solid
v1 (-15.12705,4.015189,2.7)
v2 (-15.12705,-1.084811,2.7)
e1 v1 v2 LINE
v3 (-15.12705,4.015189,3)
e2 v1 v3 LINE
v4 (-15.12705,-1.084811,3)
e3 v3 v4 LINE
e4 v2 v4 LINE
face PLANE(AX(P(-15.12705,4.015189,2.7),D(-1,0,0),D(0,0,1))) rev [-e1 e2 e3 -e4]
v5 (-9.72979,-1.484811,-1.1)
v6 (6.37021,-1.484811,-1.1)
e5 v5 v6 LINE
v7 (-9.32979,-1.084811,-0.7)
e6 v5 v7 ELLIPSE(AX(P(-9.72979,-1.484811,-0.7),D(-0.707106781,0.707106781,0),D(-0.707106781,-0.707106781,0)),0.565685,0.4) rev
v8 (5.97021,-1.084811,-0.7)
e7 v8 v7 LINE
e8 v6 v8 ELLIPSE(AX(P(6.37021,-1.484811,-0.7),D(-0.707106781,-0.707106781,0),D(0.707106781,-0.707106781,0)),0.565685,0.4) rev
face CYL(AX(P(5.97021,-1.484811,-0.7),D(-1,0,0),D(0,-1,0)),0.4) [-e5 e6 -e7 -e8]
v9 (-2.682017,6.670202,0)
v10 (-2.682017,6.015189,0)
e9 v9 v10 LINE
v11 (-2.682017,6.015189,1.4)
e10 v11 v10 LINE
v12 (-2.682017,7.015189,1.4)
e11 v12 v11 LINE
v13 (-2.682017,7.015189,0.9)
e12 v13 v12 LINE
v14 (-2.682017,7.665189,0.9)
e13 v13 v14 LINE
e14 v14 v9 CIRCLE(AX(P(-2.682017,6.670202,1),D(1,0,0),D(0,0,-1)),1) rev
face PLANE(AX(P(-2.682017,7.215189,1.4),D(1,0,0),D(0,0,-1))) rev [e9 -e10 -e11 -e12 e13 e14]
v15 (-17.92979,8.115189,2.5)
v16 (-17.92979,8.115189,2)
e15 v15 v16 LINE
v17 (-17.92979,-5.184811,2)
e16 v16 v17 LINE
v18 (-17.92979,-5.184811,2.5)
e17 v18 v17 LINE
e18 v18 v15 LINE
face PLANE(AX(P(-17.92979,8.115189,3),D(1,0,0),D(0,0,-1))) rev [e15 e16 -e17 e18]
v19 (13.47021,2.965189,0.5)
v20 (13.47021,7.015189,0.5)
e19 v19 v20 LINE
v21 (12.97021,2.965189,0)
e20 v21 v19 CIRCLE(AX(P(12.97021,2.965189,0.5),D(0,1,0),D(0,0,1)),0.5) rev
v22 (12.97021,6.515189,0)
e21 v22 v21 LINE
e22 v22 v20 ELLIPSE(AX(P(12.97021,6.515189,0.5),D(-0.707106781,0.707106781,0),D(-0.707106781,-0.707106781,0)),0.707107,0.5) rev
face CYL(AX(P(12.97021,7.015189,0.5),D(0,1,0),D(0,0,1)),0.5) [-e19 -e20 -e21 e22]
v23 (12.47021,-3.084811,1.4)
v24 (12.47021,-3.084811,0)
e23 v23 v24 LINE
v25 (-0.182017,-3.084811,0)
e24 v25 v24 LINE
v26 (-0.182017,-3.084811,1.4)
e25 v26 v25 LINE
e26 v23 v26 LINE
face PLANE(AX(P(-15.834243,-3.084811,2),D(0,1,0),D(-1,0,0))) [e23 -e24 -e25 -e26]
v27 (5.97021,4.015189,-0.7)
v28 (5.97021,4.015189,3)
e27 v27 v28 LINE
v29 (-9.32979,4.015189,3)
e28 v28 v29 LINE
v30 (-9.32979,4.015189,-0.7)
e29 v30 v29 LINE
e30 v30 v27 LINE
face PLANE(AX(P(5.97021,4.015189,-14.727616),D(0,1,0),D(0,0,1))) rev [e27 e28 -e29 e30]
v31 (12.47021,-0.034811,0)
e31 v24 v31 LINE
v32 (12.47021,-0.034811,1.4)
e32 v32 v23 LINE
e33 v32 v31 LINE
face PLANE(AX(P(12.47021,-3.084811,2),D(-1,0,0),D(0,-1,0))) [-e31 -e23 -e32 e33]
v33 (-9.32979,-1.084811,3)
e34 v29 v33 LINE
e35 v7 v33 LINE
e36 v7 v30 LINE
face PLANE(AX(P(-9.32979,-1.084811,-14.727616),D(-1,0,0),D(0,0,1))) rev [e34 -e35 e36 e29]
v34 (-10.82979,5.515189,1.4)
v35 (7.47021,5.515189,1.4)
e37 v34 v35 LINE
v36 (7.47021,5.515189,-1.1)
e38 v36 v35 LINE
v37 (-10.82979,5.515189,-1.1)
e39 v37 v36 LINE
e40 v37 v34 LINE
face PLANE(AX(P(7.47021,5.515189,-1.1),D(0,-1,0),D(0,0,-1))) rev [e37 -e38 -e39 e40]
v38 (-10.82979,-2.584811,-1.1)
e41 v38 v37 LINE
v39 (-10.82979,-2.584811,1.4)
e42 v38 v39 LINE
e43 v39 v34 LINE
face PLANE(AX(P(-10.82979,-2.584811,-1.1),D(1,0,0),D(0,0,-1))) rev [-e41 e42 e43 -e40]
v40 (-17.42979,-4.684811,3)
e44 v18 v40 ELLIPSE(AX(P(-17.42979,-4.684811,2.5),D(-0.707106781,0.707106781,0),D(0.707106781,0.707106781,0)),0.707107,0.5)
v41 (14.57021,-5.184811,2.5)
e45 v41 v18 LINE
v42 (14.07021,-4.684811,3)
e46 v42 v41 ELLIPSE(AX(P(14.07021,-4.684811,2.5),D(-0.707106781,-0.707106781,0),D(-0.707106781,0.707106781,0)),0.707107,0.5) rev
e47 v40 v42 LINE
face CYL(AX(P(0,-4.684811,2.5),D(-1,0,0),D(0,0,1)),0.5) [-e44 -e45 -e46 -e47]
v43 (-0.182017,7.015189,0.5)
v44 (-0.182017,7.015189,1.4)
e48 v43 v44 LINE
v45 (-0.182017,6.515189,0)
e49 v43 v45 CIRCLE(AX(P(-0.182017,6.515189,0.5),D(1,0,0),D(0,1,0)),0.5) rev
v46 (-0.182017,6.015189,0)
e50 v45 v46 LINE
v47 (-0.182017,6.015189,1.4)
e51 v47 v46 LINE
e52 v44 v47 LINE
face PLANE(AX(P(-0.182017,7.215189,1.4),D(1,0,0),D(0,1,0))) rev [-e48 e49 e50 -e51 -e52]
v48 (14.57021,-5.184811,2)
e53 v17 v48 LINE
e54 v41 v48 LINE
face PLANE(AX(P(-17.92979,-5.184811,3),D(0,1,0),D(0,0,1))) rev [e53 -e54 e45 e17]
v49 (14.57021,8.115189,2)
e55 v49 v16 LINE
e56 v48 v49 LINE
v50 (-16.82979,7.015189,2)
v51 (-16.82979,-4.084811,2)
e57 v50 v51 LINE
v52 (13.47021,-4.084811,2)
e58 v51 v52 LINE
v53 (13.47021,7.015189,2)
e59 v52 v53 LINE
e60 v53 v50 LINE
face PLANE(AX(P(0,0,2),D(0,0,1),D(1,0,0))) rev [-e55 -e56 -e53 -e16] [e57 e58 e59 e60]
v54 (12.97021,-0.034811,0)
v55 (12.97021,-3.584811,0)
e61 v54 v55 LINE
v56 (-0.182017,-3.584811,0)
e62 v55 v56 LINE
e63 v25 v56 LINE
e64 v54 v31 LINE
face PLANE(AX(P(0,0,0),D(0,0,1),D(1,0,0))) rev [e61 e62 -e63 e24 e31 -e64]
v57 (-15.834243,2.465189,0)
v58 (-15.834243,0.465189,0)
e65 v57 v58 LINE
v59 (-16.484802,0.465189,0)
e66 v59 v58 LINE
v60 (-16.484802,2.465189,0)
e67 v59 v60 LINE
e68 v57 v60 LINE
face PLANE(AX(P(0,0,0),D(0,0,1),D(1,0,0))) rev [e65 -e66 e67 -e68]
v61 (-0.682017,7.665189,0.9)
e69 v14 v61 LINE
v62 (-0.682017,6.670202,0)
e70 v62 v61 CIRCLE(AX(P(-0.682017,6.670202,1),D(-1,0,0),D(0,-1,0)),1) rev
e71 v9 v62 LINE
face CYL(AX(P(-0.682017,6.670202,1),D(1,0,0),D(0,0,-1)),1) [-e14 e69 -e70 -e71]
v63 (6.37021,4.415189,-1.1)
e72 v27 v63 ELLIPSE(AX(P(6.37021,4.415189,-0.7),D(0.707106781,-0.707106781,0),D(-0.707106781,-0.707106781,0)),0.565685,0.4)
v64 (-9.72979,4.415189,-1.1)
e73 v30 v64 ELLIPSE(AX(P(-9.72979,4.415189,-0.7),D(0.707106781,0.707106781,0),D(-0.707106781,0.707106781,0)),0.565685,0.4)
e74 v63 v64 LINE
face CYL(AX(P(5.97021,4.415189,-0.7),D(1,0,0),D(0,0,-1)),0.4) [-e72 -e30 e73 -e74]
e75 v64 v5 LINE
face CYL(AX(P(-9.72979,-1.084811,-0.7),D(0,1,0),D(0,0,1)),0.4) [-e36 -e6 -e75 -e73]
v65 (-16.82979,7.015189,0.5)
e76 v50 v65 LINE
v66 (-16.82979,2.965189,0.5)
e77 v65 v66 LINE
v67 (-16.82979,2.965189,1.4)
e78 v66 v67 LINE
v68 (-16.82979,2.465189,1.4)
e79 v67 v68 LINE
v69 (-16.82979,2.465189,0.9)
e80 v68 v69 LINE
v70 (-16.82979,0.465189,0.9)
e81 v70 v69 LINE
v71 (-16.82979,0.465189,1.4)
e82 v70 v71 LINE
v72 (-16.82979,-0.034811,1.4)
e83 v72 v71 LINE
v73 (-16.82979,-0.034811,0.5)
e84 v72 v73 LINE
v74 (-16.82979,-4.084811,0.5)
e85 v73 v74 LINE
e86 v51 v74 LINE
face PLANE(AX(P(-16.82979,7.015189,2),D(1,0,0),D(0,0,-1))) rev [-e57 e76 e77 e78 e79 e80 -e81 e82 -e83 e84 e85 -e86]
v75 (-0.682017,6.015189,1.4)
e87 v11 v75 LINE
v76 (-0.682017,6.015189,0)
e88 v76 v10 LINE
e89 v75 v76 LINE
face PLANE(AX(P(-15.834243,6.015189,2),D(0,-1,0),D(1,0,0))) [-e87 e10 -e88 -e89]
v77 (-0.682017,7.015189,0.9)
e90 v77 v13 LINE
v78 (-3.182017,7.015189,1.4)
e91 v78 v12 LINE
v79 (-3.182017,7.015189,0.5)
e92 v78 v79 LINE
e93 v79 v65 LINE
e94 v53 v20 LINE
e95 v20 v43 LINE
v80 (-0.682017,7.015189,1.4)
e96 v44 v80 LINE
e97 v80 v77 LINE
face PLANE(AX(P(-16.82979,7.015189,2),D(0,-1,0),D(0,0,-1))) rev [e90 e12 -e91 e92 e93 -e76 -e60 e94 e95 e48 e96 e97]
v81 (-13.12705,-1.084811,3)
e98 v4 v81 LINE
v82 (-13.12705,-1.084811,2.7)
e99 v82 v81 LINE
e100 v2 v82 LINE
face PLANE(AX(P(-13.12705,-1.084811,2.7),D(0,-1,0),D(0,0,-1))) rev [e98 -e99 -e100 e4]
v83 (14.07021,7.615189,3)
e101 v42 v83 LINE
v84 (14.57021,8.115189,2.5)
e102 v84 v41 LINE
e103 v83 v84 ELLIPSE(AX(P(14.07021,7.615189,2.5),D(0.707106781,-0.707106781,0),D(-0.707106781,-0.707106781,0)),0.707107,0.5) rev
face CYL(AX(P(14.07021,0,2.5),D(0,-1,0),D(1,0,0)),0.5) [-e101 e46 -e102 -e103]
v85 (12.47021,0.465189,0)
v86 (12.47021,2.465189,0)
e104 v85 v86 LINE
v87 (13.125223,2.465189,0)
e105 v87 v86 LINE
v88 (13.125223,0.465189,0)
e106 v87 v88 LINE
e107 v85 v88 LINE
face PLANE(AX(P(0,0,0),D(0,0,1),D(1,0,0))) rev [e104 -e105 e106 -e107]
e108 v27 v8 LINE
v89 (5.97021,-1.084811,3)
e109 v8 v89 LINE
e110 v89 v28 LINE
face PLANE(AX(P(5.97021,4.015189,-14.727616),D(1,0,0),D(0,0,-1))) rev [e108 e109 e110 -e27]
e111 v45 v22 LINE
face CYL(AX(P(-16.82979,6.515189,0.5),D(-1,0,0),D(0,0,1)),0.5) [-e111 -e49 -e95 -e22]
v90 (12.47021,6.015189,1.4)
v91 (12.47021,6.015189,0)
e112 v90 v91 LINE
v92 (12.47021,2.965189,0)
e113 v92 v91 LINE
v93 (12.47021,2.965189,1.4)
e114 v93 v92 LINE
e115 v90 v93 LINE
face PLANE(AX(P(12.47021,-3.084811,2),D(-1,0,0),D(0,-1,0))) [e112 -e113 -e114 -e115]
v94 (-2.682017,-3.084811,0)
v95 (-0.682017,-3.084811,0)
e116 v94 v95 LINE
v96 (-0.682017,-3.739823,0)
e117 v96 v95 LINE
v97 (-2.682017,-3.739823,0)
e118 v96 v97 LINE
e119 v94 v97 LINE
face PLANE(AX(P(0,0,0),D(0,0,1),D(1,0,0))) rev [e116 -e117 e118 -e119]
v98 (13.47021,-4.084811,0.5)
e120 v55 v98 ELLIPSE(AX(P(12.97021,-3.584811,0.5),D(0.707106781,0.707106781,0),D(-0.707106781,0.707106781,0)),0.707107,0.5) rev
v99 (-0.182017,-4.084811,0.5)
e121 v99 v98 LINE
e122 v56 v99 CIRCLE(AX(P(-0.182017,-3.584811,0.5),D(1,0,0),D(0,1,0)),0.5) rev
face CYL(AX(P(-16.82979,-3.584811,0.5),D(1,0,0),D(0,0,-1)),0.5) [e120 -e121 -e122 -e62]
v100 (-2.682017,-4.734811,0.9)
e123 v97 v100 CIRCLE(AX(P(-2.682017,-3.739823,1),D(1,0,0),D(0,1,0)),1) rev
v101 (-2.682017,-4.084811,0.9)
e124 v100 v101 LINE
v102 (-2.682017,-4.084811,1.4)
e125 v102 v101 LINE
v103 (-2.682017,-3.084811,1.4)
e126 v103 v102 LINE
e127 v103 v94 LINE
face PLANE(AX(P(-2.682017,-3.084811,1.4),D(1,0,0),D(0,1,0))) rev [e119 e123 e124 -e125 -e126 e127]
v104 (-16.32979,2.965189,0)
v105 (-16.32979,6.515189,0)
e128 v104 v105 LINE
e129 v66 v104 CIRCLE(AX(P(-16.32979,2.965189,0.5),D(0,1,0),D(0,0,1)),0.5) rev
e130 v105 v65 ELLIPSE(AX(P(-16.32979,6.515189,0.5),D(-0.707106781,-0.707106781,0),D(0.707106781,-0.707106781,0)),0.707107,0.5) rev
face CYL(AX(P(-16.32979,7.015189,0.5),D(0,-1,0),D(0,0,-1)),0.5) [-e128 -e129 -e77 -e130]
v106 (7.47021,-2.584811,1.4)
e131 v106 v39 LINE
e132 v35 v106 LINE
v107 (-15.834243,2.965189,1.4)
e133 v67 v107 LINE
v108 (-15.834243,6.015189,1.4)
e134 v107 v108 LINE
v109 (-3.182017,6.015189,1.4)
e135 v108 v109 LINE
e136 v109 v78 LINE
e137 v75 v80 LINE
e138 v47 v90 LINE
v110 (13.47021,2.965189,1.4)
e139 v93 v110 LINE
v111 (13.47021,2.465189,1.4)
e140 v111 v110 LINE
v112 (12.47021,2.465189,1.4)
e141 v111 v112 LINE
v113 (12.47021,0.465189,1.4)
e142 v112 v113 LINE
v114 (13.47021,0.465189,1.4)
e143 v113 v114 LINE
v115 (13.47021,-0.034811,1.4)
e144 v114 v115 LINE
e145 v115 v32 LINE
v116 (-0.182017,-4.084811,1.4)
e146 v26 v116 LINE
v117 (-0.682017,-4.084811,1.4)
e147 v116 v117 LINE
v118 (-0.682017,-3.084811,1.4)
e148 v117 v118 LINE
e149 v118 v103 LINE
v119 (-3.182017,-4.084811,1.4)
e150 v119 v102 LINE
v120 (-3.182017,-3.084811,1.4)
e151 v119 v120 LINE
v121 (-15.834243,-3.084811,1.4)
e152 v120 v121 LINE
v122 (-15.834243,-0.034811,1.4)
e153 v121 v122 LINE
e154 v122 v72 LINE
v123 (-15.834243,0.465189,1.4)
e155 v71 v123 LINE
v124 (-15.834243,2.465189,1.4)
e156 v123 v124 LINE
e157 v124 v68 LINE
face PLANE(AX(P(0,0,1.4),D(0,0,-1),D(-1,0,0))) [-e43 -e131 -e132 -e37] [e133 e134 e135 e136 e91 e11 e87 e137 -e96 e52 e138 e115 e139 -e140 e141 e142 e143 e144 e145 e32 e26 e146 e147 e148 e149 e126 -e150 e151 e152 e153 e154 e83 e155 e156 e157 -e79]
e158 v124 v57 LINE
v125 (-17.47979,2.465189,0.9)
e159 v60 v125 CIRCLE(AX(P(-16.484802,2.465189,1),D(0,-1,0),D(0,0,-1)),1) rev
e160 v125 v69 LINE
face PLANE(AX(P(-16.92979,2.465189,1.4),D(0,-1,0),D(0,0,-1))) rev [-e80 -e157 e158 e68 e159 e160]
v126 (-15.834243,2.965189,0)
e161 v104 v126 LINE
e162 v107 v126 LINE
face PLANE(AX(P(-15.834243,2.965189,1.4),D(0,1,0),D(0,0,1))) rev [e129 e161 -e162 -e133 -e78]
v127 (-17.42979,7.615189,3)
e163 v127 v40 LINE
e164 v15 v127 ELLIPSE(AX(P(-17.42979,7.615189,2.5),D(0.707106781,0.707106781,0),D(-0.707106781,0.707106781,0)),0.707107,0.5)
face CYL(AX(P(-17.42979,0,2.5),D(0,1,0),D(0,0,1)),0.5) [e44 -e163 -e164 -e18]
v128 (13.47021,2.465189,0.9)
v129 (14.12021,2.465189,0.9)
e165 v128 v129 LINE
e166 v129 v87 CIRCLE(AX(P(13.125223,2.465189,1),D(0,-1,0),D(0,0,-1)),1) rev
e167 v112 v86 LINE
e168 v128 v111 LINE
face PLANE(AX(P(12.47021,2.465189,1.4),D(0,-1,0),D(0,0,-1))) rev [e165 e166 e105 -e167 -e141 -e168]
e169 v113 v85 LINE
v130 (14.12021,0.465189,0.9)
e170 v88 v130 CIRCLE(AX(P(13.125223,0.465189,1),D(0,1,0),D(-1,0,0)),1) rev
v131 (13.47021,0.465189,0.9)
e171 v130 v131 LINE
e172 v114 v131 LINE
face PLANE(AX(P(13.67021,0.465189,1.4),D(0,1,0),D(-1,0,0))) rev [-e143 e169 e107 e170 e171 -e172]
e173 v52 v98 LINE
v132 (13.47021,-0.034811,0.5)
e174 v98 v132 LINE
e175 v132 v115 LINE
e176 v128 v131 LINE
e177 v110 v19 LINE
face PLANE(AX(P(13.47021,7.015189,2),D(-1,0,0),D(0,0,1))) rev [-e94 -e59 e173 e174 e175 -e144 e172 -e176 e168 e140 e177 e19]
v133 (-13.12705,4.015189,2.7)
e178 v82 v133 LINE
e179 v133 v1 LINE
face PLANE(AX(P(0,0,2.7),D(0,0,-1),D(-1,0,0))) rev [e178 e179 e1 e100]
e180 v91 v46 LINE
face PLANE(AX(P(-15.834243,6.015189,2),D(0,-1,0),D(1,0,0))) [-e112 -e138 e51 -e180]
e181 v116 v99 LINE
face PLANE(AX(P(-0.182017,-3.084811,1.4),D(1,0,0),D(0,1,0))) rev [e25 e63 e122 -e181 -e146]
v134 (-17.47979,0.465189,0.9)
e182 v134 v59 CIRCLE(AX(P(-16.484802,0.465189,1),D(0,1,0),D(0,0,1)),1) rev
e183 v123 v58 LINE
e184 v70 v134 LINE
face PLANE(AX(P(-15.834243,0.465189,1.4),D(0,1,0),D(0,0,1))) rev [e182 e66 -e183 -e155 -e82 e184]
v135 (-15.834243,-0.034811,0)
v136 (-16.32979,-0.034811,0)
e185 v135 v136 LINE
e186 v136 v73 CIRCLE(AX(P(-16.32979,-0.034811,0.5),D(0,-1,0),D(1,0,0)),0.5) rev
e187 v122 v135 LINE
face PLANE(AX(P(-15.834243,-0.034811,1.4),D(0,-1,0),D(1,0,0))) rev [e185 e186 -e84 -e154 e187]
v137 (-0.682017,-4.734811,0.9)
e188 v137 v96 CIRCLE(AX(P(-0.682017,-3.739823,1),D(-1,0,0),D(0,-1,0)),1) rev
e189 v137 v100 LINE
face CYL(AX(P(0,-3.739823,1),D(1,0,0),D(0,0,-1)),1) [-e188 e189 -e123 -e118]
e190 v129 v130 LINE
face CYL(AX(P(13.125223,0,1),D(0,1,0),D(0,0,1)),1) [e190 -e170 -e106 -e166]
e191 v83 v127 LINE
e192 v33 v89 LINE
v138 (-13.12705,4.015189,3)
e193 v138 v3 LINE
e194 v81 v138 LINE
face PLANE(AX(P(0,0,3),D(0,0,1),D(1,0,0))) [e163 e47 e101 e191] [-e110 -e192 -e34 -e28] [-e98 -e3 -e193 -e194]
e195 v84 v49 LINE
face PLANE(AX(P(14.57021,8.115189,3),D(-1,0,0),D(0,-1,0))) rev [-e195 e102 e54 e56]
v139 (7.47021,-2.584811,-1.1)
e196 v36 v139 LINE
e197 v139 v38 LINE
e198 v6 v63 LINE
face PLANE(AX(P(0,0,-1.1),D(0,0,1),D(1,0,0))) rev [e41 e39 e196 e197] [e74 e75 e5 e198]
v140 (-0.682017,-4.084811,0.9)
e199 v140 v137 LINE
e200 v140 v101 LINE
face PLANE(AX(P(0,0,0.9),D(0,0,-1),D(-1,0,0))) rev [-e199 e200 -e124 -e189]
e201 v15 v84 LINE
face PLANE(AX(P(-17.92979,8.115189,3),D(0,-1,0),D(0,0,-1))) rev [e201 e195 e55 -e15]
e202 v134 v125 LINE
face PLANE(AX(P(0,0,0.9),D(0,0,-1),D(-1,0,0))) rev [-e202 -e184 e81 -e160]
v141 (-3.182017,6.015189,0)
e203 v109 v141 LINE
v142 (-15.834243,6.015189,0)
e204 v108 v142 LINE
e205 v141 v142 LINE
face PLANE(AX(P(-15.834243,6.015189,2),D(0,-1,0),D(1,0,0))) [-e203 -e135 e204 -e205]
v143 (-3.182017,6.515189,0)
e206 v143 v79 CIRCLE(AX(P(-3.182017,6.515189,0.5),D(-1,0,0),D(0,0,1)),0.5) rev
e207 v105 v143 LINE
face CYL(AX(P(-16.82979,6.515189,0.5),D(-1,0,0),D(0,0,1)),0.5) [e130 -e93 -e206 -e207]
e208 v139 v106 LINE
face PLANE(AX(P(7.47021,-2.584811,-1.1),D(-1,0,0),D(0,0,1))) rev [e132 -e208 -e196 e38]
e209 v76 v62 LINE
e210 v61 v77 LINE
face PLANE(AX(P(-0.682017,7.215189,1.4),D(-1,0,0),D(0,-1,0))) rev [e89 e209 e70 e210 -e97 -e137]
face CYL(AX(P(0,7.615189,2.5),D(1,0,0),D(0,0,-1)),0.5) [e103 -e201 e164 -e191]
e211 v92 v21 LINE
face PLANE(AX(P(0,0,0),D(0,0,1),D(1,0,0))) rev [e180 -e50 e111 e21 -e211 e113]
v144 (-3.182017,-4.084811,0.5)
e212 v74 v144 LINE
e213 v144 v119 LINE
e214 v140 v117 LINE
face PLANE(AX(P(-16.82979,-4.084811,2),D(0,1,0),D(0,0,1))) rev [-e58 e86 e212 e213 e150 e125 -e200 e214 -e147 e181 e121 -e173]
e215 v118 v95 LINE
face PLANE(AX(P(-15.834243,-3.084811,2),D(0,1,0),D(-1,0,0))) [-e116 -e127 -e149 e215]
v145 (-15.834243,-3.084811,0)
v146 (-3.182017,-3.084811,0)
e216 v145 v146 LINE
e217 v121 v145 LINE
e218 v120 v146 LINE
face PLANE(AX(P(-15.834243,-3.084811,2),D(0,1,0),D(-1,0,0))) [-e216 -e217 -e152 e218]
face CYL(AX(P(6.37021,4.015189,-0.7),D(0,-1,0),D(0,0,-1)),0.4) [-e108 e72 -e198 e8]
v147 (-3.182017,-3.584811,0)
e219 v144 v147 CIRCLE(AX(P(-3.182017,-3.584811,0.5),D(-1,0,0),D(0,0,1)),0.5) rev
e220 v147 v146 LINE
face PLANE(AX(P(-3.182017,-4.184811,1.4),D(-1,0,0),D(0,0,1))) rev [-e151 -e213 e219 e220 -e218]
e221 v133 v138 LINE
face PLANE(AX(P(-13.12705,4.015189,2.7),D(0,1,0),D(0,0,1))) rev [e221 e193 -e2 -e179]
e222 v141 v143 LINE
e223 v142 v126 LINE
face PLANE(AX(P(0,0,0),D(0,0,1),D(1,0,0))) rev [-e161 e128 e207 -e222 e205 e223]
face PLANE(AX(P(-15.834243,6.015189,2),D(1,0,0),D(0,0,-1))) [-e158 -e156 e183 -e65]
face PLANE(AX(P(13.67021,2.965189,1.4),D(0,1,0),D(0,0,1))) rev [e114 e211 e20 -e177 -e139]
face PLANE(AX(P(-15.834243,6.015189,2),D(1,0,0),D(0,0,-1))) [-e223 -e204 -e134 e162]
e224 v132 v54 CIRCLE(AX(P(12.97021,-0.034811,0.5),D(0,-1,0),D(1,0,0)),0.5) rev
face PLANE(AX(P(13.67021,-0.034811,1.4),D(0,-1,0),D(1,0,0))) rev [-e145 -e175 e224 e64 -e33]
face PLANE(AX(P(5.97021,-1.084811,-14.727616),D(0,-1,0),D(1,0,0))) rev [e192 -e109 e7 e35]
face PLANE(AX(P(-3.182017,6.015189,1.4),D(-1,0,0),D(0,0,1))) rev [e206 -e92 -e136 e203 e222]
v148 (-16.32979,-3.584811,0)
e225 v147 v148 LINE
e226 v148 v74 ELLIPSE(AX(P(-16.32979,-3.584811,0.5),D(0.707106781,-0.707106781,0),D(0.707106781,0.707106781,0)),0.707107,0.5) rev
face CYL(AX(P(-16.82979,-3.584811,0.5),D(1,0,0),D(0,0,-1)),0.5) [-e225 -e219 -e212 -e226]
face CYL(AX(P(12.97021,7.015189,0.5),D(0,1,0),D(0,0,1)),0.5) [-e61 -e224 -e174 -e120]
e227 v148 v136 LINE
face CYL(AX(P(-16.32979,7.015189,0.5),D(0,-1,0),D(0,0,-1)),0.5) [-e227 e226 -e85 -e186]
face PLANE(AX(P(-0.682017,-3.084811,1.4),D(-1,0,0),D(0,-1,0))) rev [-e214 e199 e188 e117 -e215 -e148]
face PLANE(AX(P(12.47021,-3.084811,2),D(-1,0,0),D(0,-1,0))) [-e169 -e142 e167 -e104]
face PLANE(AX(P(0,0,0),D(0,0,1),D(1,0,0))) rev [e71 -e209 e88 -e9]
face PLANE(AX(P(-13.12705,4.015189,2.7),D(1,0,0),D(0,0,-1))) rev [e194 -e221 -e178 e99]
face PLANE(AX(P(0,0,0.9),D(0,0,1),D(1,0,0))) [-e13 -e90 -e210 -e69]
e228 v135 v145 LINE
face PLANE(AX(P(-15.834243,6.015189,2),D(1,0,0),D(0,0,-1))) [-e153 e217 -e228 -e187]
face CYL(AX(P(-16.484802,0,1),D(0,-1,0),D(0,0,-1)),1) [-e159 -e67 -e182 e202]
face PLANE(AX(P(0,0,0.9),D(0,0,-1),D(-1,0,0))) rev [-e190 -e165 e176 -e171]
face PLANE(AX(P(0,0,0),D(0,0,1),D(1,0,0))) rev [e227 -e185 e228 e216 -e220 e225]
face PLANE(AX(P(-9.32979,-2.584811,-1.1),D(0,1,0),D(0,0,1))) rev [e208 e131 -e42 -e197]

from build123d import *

# Parameters (mm, degrees)
SZKIC1_W                    = 30.3
SZKIC1_H                    = 11.1
SZKIC1_W_2                  = 28.304453741
SZKIC1_H_2                  = 9.1
DODANIE_WYCI_GNI_CIE1_DEPTH = 2
SZKIC2_W                    = 32.5
SZKIC2_H                    = 13.3
DODANIE_WYCI_GNI_CIE2_DEPTH = 1
ZAOKR_GLENIE1_R             = 0.5
SZKIC3_W                    = 1.095546259
SZKIC3_H                    = 0.5
SZKIC3_W_2                  = 1.2
SZKIC3_W_3                  = 0.5
SZKIC3_H_2                  = 1.2
SZKIC3_H_3                  = 1.1
WYTNIJ_WYCI_GNI_CIE1_DEPTH  = 1.4
ZAOKR_GLENIE2_R             = 0.5
SZKIC4_W                    = 2
SZKIC4_H                    = 1.15
SZKIC4_W_2                  = 1.145546259
SZKIC4_H_2                  = 2
SZKIC4_W_3                  = 1.15
DODANIE_WYCI_GNI_CIE3_DEPTH = 0.9
SZKIC5_W                    = 0.9
SZKIC5_H                    = 2
DODANIE_WYCI_GNI_CIE4_DEPTH = 0.5
SZKIC6_W                    = 2
SZKIC6_H                    = 0.9
DODANIE_WYCI_GNI_CIE5_DEPTH = 0.5
SZKIC7_W                    = 0.9
SZKIC7_H                    = 2
DODANIE_WYCI_GNI_CIE6_DEPTH = 0.5
ZAOKR_GLENIE5_R             = 1
SZKIC8_W                    = 28.304453741
SZKIC8_H                    = 9.1
DODANIE_WYCI_GNI_CIE7_DEPTH = 0.6
SZKIC9_W                    = 15.3
SZKIC9_H                    = 5.1
WYTNIJ_WYCI_GNI_CIE2_DEPTH  = 1.6
SZKIC10_W                   = 15.3
SZKIC10_H                   = 5.1
DODANIE_WYCI_GNI_CIE8_DEPTH = 2.5
ZAOKR_GLENIE6_R             = 0.4
SZKIC11_W                   = 2
SZKIC11_H                   = 5.1
WYTNIJ_WYCI_GNI_CIE3_DEPTH  = 0.3


with BuildPart() as part:
    # Szkic1 → Dodanie-wyciągnięcie1 (new body)
    with BuildSketch(Plane.XY):
        with Locations((-1.679789747, 1.465189223)):
            Rectangle(SZKIC1_W, SZKIC1_H)
        with Locations((-1.682016617, 1.465189223)):
            Rectangle(SZKIC1_W_2, SZKIC1_H_2, mode=Mode.SUBTRACT)
    extrude(amount=DODANIE_WYCI_GNI_CIE1_DEPTH)

    # Szkic2 → Dodanie-wyciągnięcie2 (add)
    with BuildSketch(Plane.XY.offset(2)):
        with Locations((-1.679789747, 1.465189223)):
            Rectangle(SZKIC2_W, SZKIC2_H)
    extrude(amount=DODANIE_WYCI_GNI_CIE2_DEPTH)

    # Zaokrąglenie1
    zaokr_glenie1_edges = [part.edges().sort_by_distance(p)[0] for p in [
        (-17.929789747, 1.465189223, 3),
        (-1.679789747, -5.184810777, 3),
        (14.570210253, 1.465189223, 3),
        (-1.679789747, 8.115189223, 3),
    ]]
    fillet(zaokr_glenie1_edges, radius=ZAOKR_GLENIE1_R)

    # Szkic3 → Wytnij-wyciągnięcie1 (cut)
    with BuildSketch(Plane(origin=(0, 0, 0), x_dir=(-1, 0, 0), z_dir=(0, 0, -1))):
        with Locations((16.382016617, 2.715189223)):
            Rectangle(SZKIC3_W, SZKIC3_H)
        with Locations((-13.070210253, 0.215189223)):
            Rectangle(SZKIC3_W_2, SZKIC3_H)
        with Locations((2.932016617, 6.615189223)):
            Rectangle(SZKIC3_W_3, SZKIC3_H_2)
        with Locations((0.432016617, 6.615189223)):
            Rectangle(SZKIC3_W_3, SZKIC3_H_2)
        with Locations((-13.070210253, 2.715189223)):
            Rectangle(SZKIC3_W_2, SZKIC3_H)
        with Locations((2.932016617, -3.634810777)):
            Rectangle(SZKIC3_W_3, SZKIC3_H_3)
        with Locations((0.432016617, -3.634810777)):
            Rectangle(SZKIC3_W_3, SZKIC3_H_3)
        with Locations((16.382016617, 0.215189223)):
            Rectangle(SZKIC3_W, SZKIC3_H)
    extrude(amount=-WYTNIJ_WYCI_GNI_CIE1_DEPTH, mode=Mode.SUBTRACT)

    # Zaokrąglenie2
    zaokr_glenie2_edges = [part.edges().sort_by_distance(p)[0] for p in [
        (6.644096818, 7.015189223, 0),
        (13.470210253, -2.059810777, 0),
        (-10.005903182, -4.084810777, 0),
        (-16.829789747, 4.990189223, 0),
        (-10.005903182, 7.015189223, 0),
        (13.470210253, 4.990189223, 0),
        (6.644096818, -4.084810777, 0),
        (-16.829789747, -2.059810777, 0),
    ]]
    fillet(zaokr_glenie2_edges, radius=ZAOKR_GLENIE2_R)

    # Szkic4 → Dodanie-wyciągnięcie3 (add)
    with BuildSketch(Plane(origin=(0, 0, 0), x_dir=(-1, 0, 0), z_dir=(0, 0, -1))):
        Polygon((0.682016617, 6.015189223), (2.682016617, 6.015189223), (2.682016617, 7.165189223), (2.682016617, 7.665189223), (0.682016617, 7.665189223), (0.682016617, 7.165189223), align=None)
        with Locations((1.682016617, -3.659810777)):
            Rectangle(SZKIC4_W, SZKIC4_H)
        with Locations((16.407016618, 1.465189223)):
            Rectangle(SZKIC4_W_2, SZKIC4_H_2)
        with Locations((-13.045210253, 1.465189223)):
            Rectangle(SZKIC4_W_3, SZKIC4_H_2)
    extrude(amount=-DODANIE_WYCI_GNI_CIE3_DEPTH)

    # Szkic5 → Dodanie-wyciągnięcie4 (add)
    with BuildSketch(Plane(origin=(13.620210253, 0, 0), x_dir=(0, 0, -1), z_dir=(1, 0, 0))):
        with Locations((-0.45, 1.465189223)):
            Rectangle(SZKIC5_W, SZKIC5_H)
    extrude(amount=DODANIE_WYCI_GNI_CIE4_DEPTH)

    # Szkic6 → Dodanie-wyciągnięcie5 (add)
    with BuildSketch(Plane.XZ.offset(4.234810777)):
        with Locations((-1.682016617, 0.45)):
            Rectangle(SZKIC6_W, SZKIC6_H)
    extrude(amount=DODANIE_WYCI_GNI_CIE5_DEPTH)

    # Szkic7 → Dodanie-wyciągnięcie6 (add)
    with BuildSketch(Plane.ZY.offset(16.979789747)):
        with Locations((0.45, 1.465189223)):
            Rectangle(SZKIC7_W, SZKIC7_H)
    extrude(amount=DODANIE_WYCI_GNI_CIE6_DEPTH)

    # Zaokrąglenie5
    # the kernel refuses this fillet: 1 mm, written as the material it takes off along each edge
    with BuildSketch(Plane(origin=(-5.16948521, 7.665189223, 0), x_dir=(0, -1, 0), z_dir=(1, 0, 0))) as zaokr_glenie5_piece_1:
        with BuildLine():
            CenterArc((0.994987437, -1), ZAOKR_GLENIE5_R, 90, 84.260829523)
            Line((0, -0.9), (-0.019899749, -0.898))
            ThreePointArc((-0.019899749, -0.898), (-0.02, -0.45), (-0.02, 0))
            Line((-0.02, 0), (0, 0.02))
            Line((0, 0.02), (0.994987437, 0.02))
            Line((0.994987437, 0.02), (0.994987437, 0))
        make_face()
    extrude(amount=6.974937186, mode=Mode.SUBTRACT)
    with BuildSketch(Plane(origin=(14.120210253, 4.952657816, 0), x_dir=(0, 0, 1), z_dir=(0, -1, 0)), Plane(origin=(1.805451975, -4.734810777, 0), x_dir=(0, 0, 1), z_dir=(-1, 0, 0)), Plane(origin=(-17.479789747, -2.02227937, 0), x_dir=(0, 0, 1), z_dir=(0, 1, 0))) as zaokr_glenie5_piece_2:
        with BuildLine():
            CenterArc((1, 0.994987437), ZAOKR_GLENIE5_R, 180, 84.260829523)
            Line((0, 0.994987437), (-0.02, 0.994987437))
            Line((-0.02, 0.994987437), (-0.02, 0))
            Line((-0.02, 0), (0, -0.02))
            ThreePointArc((0, -0.02), (0.45, -0.02), (0.898, -0.019899749))
            Line((0.898, -0.019899749), (0.9, 0))
        make_face()
    extrude(amount=6.974937186, mode=Mode.SUBTRACT)

    # Szkic8 → Dodanie-wyciągnięcie7 (add)
    with BuildSketch(Plane(origin=(0, 0, 2), x_dir=(-1, 0, 0), z_dir=(0, 0, -1))):
        with Locations((1.682016617, 1.465189223)):
            Rectangle(SZKIC8_W, SZKIC8_H)
    extrude(amount=DODANIE_WYCI_GNI_CIE7_DEPTH)

    # Szkic9 → Wytnij-wyciągnięcie2 (cut)
    with BuildSketch(Plane.XY.offset(3)):
        with Locations((-1.679789747, 1.465189223)):
            Rectangle(SZKIC9_W, SZKIC9_H)
    extrude(amount=-WYTNIJ_WYCI_GNI_CIE2_DEPTH, mode=Mode.SUBTRACT)

    # Szkic10 → Dodanie-wyciągnięcie8 (add)
    with BuildSketch(Plane(origin=(0, 0, 1.4), x_dir=(-1, 0, 0), z_dir=(0, 0, -1))):
        Polygon((-7.470210253, 5.515189223), (10.829789747, 5.515189223), (10.829789747, -2.584810777), (9.329789747, -2.584810777), (-5.970210253, -2.584810777), (-7.470210253, -2.584810777), align=None)
        with Locations((1.679789747, 1.465189223)):
            Rectangle(SZKIC10_W, SZKIC10_H, mode=Mode.SUBTRACT)
    extrude(amount=DODANIE_WYCI_GNI_CIE8_DEPTH)

    # Zaokrąglenie6
    zaokr_glenie6_edges = [part.edges().sort_by_distance(p)[0] for p in [
        (5.970210253, 1.465189223, -1.1),
        (-1.679789747, -1.084810777, -1.1),
        (-9.329789747, 1.465189223, -1.1),
        (-1.679789747, 4.015189223, -1.1),
    ]]
    fillet(zaokr_glenie6_edges, radius=ZAOKR_GLENIE6_R)

    # Szkic11 → Wytnij-wyciągnięcie3 (cut)
    with BuildSketch(Plane.XY.offset(3)):
        with Locations((-14.12705039, 1.465189223)):
            Rectangle(SZKIC11_W, SZKIC11_H)
    extrude(amount=-WYTNIJ_WYCI_GNI_CIE3_DEPTH, mode=Mode.SUBTRACT)


solid = part.part
